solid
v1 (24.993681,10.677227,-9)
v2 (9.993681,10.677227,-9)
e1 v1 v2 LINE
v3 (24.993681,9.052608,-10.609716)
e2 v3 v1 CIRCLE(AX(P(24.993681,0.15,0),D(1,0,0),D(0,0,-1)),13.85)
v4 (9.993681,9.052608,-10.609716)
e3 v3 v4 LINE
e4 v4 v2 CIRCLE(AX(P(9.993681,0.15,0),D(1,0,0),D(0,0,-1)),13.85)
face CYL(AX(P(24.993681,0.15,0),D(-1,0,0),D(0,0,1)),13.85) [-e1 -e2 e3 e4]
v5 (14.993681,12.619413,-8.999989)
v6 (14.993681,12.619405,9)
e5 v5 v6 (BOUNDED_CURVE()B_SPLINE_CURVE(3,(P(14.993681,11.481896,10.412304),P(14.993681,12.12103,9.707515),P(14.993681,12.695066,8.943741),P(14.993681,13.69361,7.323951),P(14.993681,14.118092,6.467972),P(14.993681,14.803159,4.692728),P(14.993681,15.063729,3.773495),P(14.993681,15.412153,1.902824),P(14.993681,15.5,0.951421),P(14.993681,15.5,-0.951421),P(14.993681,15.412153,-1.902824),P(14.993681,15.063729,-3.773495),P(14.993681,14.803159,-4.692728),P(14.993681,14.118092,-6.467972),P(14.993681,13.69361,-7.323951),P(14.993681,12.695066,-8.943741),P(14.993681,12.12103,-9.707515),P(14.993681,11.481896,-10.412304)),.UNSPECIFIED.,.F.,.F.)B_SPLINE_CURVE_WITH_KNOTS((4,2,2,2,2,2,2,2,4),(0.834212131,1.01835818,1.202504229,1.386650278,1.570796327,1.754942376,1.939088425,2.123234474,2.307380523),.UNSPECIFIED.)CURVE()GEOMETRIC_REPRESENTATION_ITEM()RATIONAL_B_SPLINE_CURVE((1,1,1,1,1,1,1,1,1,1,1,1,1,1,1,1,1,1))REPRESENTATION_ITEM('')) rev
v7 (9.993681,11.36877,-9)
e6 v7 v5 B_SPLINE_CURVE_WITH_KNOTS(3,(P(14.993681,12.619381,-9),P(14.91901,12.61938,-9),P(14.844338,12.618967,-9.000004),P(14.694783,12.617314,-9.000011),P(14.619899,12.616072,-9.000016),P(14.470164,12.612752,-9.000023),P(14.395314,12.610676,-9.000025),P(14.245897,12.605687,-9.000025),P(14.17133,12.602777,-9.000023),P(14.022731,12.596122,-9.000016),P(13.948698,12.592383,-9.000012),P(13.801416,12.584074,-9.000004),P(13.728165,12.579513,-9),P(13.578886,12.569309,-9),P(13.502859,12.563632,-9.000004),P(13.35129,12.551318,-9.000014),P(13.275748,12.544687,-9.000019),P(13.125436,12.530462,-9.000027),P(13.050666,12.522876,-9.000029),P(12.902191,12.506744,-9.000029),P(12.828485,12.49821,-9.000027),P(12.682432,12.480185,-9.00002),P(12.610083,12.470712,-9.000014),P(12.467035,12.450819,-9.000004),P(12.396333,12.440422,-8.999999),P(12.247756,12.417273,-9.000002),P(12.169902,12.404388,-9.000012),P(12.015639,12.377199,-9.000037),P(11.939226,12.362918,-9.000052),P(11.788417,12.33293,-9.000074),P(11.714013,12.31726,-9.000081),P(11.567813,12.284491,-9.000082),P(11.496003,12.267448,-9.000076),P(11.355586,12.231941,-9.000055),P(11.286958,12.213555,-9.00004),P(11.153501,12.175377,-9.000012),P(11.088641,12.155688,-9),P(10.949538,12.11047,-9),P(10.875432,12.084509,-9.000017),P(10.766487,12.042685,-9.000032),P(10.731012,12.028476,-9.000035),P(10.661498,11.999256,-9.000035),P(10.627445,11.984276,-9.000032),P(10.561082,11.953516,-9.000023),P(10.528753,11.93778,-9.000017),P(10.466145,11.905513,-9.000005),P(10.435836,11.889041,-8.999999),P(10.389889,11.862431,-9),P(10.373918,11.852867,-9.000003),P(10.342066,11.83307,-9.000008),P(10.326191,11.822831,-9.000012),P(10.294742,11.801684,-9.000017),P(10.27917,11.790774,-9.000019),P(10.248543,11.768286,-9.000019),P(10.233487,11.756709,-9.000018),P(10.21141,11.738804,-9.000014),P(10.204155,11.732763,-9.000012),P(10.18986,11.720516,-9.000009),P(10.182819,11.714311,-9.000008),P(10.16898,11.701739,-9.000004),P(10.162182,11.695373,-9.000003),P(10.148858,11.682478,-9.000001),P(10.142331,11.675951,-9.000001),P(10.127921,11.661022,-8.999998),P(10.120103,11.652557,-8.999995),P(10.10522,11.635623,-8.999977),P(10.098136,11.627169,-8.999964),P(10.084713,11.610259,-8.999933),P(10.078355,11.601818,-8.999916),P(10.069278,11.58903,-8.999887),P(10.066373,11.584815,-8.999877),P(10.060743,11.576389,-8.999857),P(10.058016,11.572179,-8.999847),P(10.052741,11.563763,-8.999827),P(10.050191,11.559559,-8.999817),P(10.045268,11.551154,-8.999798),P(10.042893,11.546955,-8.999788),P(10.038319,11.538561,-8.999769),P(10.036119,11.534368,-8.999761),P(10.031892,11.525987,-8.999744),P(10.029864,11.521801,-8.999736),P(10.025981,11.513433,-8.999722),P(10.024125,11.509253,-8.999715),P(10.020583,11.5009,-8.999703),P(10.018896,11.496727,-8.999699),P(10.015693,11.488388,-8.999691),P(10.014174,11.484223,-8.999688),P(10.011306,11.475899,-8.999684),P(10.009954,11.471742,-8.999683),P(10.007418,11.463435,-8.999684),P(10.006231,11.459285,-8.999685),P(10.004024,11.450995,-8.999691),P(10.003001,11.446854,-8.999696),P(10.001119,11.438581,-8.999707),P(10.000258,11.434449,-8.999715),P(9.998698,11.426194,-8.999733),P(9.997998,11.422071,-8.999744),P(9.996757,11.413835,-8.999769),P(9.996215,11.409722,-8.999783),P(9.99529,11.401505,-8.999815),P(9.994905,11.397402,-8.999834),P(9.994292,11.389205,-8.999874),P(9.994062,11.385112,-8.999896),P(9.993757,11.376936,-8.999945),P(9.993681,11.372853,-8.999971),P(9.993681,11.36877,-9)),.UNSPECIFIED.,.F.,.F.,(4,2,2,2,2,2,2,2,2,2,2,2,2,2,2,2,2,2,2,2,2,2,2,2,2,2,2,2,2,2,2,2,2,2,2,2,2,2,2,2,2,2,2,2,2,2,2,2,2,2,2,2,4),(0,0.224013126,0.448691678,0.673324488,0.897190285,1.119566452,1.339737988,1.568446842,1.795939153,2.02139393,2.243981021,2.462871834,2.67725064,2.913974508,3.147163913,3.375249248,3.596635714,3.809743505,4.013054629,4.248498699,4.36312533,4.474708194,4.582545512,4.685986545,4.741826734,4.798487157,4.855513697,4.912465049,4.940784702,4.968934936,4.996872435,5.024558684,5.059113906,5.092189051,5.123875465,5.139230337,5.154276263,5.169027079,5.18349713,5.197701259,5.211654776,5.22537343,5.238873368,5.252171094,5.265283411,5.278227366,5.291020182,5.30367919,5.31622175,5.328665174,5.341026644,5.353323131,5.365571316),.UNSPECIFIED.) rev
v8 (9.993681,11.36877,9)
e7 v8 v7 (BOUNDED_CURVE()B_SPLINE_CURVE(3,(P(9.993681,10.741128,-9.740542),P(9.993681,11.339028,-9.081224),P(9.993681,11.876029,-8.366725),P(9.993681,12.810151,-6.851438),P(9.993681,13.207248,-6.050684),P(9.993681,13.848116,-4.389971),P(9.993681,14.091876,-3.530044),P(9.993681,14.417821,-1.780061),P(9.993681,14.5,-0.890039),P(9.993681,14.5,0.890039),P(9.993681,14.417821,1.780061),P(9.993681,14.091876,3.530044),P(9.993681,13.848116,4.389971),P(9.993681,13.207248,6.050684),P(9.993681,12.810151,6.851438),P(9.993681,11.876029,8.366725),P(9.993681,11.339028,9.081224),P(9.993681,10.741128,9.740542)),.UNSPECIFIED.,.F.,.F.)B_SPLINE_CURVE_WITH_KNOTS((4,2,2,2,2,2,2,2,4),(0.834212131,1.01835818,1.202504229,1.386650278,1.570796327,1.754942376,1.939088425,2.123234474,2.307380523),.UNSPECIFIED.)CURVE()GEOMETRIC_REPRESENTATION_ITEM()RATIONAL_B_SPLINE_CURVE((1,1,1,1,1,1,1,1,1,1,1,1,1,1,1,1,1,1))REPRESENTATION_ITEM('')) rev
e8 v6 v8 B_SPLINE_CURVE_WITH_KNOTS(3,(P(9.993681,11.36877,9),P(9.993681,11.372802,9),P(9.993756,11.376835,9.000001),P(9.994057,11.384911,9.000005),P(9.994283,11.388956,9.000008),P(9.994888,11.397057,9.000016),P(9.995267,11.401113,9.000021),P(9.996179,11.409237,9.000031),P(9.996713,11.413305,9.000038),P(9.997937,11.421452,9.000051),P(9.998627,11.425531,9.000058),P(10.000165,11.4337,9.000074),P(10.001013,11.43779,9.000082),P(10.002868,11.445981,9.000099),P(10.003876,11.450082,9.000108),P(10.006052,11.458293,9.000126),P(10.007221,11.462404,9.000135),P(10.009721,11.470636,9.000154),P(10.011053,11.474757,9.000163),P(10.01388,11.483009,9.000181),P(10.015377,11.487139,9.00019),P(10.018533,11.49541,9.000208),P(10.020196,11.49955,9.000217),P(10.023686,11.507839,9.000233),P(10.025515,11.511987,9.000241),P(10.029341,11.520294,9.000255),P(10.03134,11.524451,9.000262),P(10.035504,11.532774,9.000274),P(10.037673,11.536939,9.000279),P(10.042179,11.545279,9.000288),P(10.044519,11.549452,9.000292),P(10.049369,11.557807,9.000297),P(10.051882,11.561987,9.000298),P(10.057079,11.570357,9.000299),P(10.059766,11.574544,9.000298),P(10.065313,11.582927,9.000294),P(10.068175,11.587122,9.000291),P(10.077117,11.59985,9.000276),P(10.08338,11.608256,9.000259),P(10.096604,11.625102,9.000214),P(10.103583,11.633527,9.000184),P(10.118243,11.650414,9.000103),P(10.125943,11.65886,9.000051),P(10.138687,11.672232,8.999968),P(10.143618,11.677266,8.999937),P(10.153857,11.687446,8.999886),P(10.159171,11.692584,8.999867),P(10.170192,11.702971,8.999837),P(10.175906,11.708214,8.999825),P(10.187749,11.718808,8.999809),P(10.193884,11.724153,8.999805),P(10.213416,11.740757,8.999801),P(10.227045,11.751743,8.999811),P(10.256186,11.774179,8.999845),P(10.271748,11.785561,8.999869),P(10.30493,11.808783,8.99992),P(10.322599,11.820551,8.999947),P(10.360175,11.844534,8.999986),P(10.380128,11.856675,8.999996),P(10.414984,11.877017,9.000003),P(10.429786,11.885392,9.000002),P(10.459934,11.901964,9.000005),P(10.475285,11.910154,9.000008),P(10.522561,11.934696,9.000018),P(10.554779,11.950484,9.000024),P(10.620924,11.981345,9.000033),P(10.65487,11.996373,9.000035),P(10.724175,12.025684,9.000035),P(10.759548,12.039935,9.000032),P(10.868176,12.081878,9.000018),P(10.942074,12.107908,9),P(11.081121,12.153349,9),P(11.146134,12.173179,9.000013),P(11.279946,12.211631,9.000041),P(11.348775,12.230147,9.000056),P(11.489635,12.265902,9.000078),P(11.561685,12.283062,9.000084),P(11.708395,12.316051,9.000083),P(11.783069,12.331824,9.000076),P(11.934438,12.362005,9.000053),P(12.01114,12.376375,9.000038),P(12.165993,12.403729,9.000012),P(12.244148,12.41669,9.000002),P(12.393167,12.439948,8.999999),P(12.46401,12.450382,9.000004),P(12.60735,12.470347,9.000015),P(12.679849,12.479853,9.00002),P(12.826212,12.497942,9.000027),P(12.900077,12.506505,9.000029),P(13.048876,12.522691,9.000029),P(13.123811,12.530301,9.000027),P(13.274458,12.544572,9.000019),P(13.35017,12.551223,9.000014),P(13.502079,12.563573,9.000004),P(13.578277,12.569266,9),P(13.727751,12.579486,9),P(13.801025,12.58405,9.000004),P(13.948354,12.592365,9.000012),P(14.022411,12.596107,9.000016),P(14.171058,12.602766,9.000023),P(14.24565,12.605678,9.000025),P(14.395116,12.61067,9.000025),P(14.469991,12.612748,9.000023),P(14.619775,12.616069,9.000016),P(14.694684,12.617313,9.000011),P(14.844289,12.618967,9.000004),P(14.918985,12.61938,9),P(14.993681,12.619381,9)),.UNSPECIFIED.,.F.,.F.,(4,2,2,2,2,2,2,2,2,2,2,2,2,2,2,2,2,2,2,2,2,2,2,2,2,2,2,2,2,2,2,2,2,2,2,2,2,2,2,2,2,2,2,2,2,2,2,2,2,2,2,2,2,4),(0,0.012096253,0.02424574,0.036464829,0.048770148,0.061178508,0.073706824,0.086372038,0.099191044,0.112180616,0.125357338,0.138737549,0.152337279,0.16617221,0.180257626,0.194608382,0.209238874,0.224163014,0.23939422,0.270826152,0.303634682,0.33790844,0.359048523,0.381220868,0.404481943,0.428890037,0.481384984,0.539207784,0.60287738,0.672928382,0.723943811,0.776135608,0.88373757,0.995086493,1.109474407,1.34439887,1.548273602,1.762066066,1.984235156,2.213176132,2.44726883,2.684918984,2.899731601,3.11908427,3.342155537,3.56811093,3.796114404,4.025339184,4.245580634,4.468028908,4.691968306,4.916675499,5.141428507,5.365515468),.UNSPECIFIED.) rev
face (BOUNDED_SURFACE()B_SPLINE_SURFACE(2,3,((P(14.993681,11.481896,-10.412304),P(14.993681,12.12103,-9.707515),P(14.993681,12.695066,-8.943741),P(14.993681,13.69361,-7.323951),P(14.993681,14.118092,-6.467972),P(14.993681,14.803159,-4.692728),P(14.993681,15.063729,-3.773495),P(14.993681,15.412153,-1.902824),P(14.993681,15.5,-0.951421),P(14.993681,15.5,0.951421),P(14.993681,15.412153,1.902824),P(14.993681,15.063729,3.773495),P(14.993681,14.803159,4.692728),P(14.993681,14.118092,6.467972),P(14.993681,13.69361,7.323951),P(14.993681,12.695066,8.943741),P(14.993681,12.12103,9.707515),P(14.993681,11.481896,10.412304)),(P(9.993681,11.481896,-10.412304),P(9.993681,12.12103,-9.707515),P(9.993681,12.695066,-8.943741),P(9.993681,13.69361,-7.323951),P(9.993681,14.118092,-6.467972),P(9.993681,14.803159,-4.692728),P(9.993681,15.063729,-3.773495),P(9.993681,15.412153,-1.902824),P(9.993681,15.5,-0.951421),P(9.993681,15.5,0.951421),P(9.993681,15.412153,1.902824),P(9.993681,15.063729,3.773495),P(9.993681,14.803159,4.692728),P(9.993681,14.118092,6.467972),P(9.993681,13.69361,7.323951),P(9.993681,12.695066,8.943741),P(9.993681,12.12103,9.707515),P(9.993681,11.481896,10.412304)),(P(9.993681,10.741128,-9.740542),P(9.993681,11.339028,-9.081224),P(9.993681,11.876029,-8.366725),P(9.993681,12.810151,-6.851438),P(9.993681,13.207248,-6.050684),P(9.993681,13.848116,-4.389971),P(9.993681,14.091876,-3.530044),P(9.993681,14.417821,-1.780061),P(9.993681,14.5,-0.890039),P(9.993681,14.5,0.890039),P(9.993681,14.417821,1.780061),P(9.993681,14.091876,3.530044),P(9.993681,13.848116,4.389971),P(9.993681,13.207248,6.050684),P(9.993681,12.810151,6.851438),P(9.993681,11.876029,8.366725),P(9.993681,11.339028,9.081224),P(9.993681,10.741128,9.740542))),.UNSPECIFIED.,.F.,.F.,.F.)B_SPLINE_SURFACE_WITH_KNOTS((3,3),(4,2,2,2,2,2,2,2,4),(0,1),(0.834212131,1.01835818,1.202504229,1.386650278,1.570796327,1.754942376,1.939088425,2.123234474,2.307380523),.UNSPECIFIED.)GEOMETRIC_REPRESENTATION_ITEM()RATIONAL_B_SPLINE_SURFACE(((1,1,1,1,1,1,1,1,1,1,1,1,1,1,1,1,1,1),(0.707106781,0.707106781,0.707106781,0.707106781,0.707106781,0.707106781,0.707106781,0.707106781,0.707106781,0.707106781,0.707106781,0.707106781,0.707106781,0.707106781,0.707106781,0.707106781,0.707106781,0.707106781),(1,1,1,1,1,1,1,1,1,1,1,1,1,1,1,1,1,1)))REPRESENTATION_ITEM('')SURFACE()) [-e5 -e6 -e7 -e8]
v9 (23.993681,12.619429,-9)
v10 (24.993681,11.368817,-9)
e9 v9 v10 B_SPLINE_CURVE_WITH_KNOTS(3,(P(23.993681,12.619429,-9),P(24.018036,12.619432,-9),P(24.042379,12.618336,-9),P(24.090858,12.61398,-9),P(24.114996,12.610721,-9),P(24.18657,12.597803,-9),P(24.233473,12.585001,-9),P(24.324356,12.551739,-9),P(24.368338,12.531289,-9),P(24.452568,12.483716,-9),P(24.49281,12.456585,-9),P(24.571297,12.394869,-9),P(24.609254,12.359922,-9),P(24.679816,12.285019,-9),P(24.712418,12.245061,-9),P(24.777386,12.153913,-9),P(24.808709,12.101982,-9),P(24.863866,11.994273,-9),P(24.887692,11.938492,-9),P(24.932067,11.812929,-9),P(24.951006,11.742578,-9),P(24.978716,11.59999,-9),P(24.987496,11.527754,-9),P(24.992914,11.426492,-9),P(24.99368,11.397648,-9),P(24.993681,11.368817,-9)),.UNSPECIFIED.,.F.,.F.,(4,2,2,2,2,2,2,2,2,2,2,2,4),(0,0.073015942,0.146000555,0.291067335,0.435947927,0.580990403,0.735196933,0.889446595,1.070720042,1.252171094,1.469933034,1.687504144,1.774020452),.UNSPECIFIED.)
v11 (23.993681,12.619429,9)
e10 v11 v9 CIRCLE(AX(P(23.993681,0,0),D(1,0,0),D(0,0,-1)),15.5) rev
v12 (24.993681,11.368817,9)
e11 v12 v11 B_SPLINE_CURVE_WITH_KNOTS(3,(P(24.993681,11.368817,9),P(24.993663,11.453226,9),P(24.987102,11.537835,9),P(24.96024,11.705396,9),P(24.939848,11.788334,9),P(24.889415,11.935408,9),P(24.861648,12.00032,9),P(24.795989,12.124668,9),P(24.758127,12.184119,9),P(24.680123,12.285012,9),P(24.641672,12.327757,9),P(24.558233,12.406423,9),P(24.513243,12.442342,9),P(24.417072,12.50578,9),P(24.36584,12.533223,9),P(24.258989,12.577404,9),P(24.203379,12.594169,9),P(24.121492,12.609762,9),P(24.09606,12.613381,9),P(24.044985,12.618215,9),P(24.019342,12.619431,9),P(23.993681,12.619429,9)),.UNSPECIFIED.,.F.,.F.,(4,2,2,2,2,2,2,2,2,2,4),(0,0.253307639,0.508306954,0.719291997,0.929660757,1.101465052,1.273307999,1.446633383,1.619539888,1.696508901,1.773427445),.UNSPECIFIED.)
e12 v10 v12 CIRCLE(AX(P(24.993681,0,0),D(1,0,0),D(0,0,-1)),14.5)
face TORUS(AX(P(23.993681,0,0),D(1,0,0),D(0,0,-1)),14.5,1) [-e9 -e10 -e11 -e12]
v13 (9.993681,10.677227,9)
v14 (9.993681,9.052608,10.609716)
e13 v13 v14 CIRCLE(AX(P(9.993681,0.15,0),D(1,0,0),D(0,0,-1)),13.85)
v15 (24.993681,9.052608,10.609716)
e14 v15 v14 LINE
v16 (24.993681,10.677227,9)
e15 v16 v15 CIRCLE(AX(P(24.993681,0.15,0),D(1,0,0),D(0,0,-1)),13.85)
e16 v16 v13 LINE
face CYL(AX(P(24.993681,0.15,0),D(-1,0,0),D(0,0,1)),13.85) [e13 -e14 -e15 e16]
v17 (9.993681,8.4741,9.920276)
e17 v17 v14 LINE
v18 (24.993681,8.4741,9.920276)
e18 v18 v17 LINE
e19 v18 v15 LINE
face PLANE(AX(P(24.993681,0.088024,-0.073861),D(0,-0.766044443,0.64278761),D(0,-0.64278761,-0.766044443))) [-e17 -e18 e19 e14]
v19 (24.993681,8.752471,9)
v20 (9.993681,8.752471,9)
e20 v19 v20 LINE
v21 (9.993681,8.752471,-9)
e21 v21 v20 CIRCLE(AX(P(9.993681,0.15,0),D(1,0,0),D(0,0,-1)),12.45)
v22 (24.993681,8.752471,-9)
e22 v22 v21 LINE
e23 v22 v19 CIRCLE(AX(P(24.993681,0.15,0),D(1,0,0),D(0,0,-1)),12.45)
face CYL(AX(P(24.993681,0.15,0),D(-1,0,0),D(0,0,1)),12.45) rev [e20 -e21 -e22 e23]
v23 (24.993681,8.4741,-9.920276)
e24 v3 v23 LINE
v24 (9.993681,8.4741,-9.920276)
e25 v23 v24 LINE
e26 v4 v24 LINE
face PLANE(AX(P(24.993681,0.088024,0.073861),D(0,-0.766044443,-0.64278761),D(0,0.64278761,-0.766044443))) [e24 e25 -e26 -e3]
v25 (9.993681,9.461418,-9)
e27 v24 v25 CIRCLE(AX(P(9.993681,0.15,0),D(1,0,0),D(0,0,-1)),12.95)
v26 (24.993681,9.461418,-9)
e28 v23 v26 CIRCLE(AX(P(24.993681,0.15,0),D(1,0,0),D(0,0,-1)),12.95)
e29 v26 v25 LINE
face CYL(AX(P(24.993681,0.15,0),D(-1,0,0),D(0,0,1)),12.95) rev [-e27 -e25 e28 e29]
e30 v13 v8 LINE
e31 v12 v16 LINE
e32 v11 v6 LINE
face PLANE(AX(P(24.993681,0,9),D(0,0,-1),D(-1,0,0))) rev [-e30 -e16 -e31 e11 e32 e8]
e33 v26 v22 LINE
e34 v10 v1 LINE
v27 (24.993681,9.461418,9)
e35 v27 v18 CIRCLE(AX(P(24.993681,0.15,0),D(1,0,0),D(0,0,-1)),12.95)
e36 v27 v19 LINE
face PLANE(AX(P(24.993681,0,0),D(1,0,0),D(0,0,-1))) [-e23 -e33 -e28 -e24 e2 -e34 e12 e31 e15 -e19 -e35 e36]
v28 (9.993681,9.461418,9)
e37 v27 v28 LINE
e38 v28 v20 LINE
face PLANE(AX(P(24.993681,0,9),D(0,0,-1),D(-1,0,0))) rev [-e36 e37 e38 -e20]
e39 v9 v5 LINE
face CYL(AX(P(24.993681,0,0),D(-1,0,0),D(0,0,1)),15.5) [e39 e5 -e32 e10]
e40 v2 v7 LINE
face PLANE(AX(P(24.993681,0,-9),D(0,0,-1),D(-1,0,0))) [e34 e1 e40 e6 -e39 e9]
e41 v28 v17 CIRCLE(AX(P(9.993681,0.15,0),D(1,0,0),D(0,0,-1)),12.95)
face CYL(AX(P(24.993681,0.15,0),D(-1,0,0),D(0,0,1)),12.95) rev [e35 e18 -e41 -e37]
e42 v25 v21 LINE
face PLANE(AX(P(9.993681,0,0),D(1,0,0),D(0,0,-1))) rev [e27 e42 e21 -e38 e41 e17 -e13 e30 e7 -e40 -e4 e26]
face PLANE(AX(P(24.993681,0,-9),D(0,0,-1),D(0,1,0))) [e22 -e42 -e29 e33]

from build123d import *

# Parameters (mm, degrees)
P_IDAT_VYSUNUT_M2_DEPTH  = 15
SKICA3_W                 = 28.958839484
SKICA3_H                 = 34.368053108
ODEBRAT_VYSUNUT_M2_DEPTH = 19.470465231
ZAOBLIT7_R               = 1
ZAOBLIT8_SIZE            = 5
ZAOBLIT8_SIZE_2          = 1


# Read off the part's stored shape, not the designer's step: Přidat vysunutím2
with BuildPart() as part:
    # Skica1 → Rotovat1 (revolve)
    with BuildSketch(Plane.XY, mode=Mode.PRIVATE) as rotovat1_sk:
        with BuildLine():
            Line((-18.006318941, 12.994441011), (-18.006318941, 0))
            Line((-18.006318941, 0), (-15.006318941, 0))
            Line((-15.006318941, 0), (-15.006318941, 10.5))
            Line((-15.006318941, 10.5), (-5.006318941, 10.5))
            Line((-5.006318941, 10.5), (-5.006318941, 12.5))
            Line((-5.006318941, 12.5), (7.993681059, 12.5))
            Line((7.993681059, 12.5), (9.993681059, 12.604815559))
            Line((9.993681059, 12.604815559), (9.993681059, 14.5))
            ThreePointArc((9.993681059, 14.5), (9.70078784, 15.207106781), (8.993681059, 15.5))
            Line((8.993681059, 15.5), (-4.506318941, 15.5))
            Line((-4.506318941, 15.5), (-18.006318941, 12.994441011))
        make_face()
    revolve(rotovat1_sk.sketch.rotate(Axis((-22.002499385, 0, 0), (1, 0, 0)), 90), axis=Axis((-22.002499385, 0, 0), (1, 0, 0)))

    # Přidat vysunutím2 outline → Přidat vysunutím2 (add)
    with BuildSketch(Plane(origin=(9.993681059, 0, 0), x_dir=(0, 0, -1), z_dir=(1, 0, 0))):
        with BuildLine():
            ThreePointArc((9, 12.619429464), (0, 15.5), (-9, 12.619429464))
            Line((-9, 12.619429464), (-9, 10.677226605))
            ThreePointArc((-9, 10.677226605), (-9.838449164, 9.89820076), (-10.609715537, 9.052608394))
            Line((-10.609715537, 9.052608394), (-9.920275538, 8.474099545))
            ThreePointArc((-9.920275538, 8.474099545), (-9.473009337, 8.979756174), (-9, 9.461417722))
            Line((-9, 9.461417722), (-9, 8.752470575))
            ThreePointArc((-9, 8.752470575), (0, 12.6), (9, 8.752470575))
            Line((9, 8.752470575), (9, 9.461417722))
            ThreePointArc((9, 9.461417722), (9.473009337, 8.979756174), (9.920275538, 8.474099545))
            Line((9.920275538, 8.474099545), (10.609715537, 9.052608394))
            ThreePointArc((10.609715537, 9.052608394), (9.838449164, 9.89820076), (9, 10.677226605))
            Line((9, 10.677226605), (9, 12.619429464))
        make_face()
    extrude(amount=P_IDAT_VYSUNUT_M2_DEPTH)

    # Skica3 → Odebrat vysunutím2 (cut, symmetric)
    with BuildSketch(Plane.XY):
        with Locations((-4.485738683, -0.096675255)):
            Rectangle(SKICA3_W, SKICA3_H)
    extrude(amount=ODEBRAT_VYSUNUT_M2_DEPTH, both=True, mode=Mode.SUBTRACT)

    # Zaoblit7
    zaoblit7_edges = [part.edges().sort_by_distance(p)[0] for p in [
        (24.993681059, 15.5, 0),
    ]]
    fillet(zaoblit7_edges, radius=ZAOBLIT7_R)

    # Zaoblit8
    # an asymmetric fillet: 5, 1 mm, written as the material it takes off along each edge
    with BuildSketch(Plane(origin=(9.993681059, 1e-09, 0), x_dir=(0, 0.1441186549809942, -0.9895604141670529), z_dir=(0, -0.9895604141670529, -0.1441186549809942))) as zaoblit8_piece_1:
        with BuildLine():
            Bezier((15.499999999, ZAOBLIT8_SIZE), (15.499999999, 0), (15.499999999 - ZAOBLIT8_SIZE_2, 0), weights=[1, 0.707106781, 1])
            Line((15.499999999 - ZAOBLIT8_SIZE_2, 0), (15.499999999, 0))
            Line((15.499999999, 0), (15.499999999, ZAOBLIT8_SIZE))
        make_face()
    revolve(axis=Axis((9.993681059, 1e-09, 0), (1, 0, 0)), revolution_arc=163.427508421, mode=Mode.SUBTRACT)


solid = part.part
